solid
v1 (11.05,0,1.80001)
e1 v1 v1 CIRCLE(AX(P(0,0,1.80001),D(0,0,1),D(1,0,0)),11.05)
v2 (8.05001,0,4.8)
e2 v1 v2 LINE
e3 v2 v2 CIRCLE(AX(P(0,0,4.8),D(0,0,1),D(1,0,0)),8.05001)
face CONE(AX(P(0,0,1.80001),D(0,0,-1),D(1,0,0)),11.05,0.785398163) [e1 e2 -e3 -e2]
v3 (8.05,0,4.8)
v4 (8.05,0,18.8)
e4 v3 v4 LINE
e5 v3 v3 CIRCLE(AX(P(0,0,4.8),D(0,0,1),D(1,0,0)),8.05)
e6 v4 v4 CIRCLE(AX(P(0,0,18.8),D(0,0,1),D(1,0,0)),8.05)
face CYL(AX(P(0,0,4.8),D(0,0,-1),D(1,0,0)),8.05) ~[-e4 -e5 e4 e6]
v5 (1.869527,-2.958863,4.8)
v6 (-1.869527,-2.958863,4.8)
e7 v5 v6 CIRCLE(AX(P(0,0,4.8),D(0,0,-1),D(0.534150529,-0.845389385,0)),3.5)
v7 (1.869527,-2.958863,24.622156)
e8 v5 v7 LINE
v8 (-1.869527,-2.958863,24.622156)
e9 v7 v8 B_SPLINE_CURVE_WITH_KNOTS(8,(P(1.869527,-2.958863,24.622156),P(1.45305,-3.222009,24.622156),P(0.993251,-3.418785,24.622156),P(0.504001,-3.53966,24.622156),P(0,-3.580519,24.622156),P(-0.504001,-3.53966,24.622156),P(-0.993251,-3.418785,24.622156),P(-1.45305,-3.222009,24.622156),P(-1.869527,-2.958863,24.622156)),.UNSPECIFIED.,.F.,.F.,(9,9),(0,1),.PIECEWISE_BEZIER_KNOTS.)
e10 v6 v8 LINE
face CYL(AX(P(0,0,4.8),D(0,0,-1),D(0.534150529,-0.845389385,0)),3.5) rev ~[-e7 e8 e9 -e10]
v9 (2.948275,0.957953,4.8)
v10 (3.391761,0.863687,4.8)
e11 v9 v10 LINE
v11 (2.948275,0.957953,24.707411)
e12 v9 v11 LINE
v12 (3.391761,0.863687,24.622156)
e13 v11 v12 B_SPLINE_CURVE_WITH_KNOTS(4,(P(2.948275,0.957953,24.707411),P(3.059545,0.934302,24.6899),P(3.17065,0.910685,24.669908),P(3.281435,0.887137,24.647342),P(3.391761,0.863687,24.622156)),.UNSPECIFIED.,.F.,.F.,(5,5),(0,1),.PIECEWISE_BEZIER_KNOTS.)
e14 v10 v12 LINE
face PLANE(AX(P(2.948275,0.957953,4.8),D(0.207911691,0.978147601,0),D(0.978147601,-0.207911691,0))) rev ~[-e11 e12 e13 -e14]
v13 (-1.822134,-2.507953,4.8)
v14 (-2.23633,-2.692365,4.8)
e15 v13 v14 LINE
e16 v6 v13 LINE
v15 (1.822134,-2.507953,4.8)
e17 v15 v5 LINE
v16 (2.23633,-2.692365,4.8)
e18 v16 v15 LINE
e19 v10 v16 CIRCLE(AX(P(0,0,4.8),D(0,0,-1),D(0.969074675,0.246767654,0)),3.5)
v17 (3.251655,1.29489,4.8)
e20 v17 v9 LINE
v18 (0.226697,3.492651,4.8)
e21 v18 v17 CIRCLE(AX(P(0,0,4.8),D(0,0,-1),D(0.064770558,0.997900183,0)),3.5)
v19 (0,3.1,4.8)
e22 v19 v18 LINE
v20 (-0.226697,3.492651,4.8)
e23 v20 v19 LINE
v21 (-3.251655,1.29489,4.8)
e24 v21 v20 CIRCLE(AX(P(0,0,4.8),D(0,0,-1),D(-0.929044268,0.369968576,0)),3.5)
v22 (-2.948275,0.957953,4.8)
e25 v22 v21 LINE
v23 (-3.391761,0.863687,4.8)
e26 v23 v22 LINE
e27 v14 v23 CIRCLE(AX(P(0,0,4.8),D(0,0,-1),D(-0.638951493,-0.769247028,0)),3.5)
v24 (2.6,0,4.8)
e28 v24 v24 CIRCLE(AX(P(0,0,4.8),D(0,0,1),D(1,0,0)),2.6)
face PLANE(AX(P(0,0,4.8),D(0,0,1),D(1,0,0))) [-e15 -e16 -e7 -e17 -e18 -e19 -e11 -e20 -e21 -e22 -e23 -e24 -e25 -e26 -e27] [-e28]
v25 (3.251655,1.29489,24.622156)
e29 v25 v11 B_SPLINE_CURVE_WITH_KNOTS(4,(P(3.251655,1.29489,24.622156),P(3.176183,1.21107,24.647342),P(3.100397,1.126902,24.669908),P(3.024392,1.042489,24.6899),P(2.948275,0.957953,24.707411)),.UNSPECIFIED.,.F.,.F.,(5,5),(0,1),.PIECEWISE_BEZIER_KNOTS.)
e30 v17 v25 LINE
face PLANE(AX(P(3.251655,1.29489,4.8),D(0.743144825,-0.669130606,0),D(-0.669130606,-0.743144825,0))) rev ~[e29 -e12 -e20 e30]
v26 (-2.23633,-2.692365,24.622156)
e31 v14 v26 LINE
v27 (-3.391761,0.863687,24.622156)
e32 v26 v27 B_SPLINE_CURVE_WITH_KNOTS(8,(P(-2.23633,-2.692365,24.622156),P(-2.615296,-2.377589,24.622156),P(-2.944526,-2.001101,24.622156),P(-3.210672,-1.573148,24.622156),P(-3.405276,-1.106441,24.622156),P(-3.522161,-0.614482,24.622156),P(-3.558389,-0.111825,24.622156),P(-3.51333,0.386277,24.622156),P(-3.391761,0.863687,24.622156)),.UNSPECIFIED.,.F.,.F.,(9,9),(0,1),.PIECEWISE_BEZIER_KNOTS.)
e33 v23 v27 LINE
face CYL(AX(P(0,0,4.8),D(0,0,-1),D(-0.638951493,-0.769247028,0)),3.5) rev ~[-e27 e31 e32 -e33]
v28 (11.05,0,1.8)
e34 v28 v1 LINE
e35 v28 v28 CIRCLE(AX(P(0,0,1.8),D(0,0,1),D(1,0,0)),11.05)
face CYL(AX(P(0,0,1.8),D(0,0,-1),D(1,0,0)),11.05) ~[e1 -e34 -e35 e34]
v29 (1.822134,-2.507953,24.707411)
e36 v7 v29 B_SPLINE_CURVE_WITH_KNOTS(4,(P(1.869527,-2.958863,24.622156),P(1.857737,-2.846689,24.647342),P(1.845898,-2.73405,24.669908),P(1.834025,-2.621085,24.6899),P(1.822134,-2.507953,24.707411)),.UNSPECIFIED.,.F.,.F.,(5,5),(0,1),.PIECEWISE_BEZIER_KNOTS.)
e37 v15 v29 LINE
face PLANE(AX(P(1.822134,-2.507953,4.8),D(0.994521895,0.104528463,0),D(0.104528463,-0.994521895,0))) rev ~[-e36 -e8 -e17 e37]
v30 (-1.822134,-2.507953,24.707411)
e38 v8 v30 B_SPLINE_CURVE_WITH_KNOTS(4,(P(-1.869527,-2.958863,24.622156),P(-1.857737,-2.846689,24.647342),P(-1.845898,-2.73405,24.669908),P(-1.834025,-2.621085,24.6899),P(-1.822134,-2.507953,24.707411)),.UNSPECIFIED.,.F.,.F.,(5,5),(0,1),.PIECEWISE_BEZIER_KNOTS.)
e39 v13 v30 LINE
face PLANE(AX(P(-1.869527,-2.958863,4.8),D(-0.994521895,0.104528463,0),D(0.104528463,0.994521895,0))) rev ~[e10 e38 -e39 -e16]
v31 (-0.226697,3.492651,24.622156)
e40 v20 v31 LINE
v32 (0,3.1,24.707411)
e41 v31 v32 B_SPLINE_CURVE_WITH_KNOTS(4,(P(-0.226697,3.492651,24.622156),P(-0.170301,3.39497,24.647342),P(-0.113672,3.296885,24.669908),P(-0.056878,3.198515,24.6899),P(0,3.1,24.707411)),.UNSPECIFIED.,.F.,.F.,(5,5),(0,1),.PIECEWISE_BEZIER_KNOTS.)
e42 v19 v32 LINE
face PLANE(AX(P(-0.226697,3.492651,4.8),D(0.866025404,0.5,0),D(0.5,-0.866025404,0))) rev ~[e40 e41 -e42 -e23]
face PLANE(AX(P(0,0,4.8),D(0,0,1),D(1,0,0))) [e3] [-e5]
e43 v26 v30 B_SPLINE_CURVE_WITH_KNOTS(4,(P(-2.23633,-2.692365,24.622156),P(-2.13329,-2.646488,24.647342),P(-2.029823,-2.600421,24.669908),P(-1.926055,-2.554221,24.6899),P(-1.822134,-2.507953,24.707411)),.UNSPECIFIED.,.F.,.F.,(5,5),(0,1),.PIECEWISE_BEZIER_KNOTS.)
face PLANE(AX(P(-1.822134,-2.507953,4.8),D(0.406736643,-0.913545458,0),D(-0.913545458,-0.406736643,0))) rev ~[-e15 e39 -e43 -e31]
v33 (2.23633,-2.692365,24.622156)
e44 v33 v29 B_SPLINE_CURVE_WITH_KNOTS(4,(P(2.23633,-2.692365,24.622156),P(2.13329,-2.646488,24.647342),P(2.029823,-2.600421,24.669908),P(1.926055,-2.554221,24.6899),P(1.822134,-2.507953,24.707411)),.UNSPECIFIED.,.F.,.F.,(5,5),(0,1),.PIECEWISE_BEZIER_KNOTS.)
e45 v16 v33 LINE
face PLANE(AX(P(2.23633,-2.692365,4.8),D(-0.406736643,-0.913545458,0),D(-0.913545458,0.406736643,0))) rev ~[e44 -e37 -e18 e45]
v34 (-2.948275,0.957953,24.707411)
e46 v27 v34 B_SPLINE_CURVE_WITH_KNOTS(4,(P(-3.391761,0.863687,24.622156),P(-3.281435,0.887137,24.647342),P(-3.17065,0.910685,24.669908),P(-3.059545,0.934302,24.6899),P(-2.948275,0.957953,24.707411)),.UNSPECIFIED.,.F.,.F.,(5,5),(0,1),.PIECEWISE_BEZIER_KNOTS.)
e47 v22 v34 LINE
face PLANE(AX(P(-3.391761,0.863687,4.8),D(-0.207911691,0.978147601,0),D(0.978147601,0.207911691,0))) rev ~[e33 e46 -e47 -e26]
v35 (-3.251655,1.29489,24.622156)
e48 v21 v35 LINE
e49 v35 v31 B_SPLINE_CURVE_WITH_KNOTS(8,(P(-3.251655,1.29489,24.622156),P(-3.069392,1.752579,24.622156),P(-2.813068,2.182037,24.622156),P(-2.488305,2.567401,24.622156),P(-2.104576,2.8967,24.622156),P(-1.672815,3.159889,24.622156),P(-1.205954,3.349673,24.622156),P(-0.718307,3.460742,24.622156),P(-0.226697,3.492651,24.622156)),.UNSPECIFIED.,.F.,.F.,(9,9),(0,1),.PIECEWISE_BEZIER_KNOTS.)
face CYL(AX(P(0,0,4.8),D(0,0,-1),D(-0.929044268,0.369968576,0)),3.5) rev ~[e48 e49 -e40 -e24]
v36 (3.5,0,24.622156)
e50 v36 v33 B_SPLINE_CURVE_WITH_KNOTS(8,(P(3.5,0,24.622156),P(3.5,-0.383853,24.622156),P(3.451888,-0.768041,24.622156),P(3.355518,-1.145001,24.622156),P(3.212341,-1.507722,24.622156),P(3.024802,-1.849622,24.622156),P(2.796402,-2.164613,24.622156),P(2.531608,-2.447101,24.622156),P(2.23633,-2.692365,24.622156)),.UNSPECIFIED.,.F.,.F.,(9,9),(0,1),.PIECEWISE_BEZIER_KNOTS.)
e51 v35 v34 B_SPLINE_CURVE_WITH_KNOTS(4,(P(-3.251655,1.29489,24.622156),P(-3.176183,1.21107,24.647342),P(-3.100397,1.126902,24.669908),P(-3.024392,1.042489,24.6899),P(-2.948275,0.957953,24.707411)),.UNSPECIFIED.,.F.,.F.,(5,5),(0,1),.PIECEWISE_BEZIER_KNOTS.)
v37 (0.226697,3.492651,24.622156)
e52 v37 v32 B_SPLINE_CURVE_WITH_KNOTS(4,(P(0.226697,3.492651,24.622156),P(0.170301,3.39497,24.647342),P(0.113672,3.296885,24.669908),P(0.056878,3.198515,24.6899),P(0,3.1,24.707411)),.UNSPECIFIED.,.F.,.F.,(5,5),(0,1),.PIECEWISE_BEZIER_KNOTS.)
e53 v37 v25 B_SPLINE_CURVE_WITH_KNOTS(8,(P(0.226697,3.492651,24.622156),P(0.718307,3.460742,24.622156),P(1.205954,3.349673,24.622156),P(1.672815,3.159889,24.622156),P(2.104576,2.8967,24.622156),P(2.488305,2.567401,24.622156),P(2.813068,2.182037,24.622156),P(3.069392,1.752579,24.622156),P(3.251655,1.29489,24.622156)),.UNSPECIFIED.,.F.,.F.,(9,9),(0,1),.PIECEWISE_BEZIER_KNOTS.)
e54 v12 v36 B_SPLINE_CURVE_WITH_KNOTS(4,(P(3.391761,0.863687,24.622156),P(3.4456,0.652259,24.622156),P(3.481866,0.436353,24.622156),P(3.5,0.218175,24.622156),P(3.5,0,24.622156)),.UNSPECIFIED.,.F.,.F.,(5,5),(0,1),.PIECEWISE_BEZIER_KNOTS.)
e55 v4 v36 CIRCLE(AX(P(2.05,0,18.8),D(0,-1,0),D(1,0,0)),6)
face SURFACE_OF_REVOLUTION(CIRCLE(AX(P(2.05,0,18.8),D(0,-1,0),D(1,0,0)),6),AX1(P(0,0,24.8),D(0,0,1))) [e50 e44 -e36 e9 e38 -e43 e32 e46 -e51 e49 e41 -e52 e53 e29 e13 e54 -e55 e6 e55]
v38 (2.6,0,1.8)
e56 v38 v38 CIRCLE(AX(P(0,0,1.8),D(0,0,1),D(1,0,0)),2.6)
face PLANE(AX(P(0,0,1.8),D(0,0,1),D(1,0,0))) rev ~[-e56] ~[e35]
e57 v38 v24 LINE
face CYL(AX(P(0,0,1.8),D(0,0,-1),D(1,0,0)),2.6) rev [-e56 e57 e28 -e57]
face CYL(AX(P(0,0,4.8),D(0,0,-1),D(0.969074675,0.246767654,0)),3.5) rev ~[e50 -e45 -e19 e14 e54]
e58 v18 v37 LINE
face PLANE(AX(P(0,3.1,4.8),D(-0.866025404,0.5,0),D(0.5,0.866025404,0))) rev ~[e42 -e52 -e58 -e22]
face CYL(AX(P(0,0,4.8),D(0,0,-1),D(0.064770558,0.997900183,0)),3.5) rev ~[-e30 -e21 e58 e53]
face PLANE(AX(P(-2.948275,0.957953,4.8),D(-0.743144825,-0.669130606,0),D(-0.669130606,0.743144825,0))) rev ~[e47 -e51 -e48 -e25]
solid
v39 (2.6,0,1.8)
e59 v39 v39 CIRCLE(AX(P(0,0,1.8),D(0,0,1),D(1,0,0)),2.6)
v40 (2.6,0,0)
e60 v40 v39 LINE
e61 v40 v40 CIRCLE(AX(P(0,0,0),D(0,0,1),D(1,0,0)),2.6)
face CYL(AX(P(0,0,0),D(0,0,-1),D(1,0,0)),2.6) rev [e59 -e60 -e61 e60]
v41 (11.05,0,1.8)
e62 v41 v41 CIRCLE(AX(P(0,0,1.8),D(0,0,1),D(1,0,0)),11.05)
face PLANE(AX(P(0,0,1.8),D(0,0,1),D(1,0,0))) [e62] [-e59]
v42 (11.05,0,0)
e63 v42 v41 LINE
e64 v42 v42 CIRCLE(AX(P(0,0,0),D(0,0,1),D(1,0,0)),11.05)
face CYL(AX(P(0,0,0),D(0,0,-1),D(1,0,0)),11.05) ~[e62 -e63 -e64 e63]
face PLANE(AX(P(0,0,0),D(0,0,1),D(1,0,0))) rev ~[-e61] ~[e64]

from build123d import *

# Parameters (mm, degrees)
F0_R     = 11.05
F0_R_2   = 2.6
F1_DEPTH = 1.8
F2_R     = 11.05
F2_R_2   = 2.6
F3_DEPTH = 3
F4_SIZE  = 2.99999
F5_R     = 8.05
F6_DEPTH = 20


# Not quite as in the source:
# - a fillet or chamfer that OpenCascade refuses, or shapes differently, is made with other operations: its cross-section is extruded or revolved along the edge and cut away or added
# - a fillet or chamfer is up to 0.001 mm smaller than in the source, because OpenCascade refuses the exact size


with BuildPart() as f1:
    # F0 (on Top) → F1 (new body)
    with BuildSketch(Plane.XY):
        Circle(F0_R)
        Circle(F0_R_2, mode=Mode.SUBTRACT)
    extrude(amount=F1_DEPTH)


with BuildPart() as f3:
    # F2 (on face) → F3 (new body)
    with BuildSketch(Plane.XY.offset(1.8)):
        Circle(F2_R)
        Circle(F2_R_2, mode=Mode.SUBTRACT)
    extrude(amount=F3_DEPTH)

    # F4 (size 3 in the source; OpenCascade refuses exactly that, so slightly less here)
    f4_edges = [f3.edges().sort_by_distance(p)[0] for p in [
        (-11.05, 0, 4.8),
    ]]
    chamfer(f4_edges, length=F4_SIZE)

    # F5 (on face) → F6 (join)
    with BuildSketch(Plane.XY.offset(4.8)):
        Circle(F5_R)
        with BuildLine():
            ThreePointArc((-3.2516549392, 1.2948900171), (-2.057248383, 2.8315594803), (-0.2266969526, 3.4926506398))
            Line((-0.2266969526, 3.4926506398), (0, 3.1))
            Line((0, 3.1), (0.2266969526, 3.4926506398))
            ThreePointArc((0.2266969526, 3.4926506398), (2.057248383, 2.8315594803), (3.2516549392, 1.2948900171))
            Line((3.2516549392, 1.2948900171), (2.9482752005, 0.9579526826))
            Line((2.9482752005, 0.9579526826), (3.391761361, 0.8636867891))
            ThreePointArc((3.391761361, 0.8636867891), (3.328697807, -1.0815594803), (2.2363302247, -2.6923645975))
            Line((2.2363302247, -2.6923645975), (1.8221342821, -2.5079526826))
            Line((1.8221342821, -2.5079526826), (1.8695268503, -2.9588628485))
            ThreePointArc((1.8695268503, -2.9588628485), (0, -3.5), (-1.8695268503, -2.9588628485))
            Line((-1.8695268503, -2.9588628485), (-1.8221342821, -2.5079526826))
            Line((-1.8221342821, -2.5079526826), (-2.2363302247, -2.6923645975))
            ThreePointArc((-2.2363302247, -2.6923645975), (-3.328697807, -1.0815594803), (-3.391761361, 0.8636867891))
            Line((-3.391761361, 0.8636867891), (-2.9482752005, 0.9579526826))
            Line((-2.9482752005, 0.9579526826), (-3.2516549392, 1.2948900171))
        make_face(mode=Mode.SUBTRACT)
    extrude(amount=F6_DEPTH)

    # F7: fillet of radius 6 on 1 edges, made by hand

    # F7_s1 → F7_t2 (revolve, cut)
    with BuildSketch(Plane.XZ):
        with BuildLine():
            ThreePointArc((8.05, 18.8), (6.2926406871, 23.0426406871), (2.05, 24.8))
            Line((2.05, 24.8), (8.05, 24.8))
            Line((8.05, 24.8), (8.05, 18.8))
        make_face()
    revolve(axis=Axis((0, 0, 24.8), (0, 0, 1)), mode=Mode.SUBTRACT)


solid = Compound([f1.part, f3.part])
